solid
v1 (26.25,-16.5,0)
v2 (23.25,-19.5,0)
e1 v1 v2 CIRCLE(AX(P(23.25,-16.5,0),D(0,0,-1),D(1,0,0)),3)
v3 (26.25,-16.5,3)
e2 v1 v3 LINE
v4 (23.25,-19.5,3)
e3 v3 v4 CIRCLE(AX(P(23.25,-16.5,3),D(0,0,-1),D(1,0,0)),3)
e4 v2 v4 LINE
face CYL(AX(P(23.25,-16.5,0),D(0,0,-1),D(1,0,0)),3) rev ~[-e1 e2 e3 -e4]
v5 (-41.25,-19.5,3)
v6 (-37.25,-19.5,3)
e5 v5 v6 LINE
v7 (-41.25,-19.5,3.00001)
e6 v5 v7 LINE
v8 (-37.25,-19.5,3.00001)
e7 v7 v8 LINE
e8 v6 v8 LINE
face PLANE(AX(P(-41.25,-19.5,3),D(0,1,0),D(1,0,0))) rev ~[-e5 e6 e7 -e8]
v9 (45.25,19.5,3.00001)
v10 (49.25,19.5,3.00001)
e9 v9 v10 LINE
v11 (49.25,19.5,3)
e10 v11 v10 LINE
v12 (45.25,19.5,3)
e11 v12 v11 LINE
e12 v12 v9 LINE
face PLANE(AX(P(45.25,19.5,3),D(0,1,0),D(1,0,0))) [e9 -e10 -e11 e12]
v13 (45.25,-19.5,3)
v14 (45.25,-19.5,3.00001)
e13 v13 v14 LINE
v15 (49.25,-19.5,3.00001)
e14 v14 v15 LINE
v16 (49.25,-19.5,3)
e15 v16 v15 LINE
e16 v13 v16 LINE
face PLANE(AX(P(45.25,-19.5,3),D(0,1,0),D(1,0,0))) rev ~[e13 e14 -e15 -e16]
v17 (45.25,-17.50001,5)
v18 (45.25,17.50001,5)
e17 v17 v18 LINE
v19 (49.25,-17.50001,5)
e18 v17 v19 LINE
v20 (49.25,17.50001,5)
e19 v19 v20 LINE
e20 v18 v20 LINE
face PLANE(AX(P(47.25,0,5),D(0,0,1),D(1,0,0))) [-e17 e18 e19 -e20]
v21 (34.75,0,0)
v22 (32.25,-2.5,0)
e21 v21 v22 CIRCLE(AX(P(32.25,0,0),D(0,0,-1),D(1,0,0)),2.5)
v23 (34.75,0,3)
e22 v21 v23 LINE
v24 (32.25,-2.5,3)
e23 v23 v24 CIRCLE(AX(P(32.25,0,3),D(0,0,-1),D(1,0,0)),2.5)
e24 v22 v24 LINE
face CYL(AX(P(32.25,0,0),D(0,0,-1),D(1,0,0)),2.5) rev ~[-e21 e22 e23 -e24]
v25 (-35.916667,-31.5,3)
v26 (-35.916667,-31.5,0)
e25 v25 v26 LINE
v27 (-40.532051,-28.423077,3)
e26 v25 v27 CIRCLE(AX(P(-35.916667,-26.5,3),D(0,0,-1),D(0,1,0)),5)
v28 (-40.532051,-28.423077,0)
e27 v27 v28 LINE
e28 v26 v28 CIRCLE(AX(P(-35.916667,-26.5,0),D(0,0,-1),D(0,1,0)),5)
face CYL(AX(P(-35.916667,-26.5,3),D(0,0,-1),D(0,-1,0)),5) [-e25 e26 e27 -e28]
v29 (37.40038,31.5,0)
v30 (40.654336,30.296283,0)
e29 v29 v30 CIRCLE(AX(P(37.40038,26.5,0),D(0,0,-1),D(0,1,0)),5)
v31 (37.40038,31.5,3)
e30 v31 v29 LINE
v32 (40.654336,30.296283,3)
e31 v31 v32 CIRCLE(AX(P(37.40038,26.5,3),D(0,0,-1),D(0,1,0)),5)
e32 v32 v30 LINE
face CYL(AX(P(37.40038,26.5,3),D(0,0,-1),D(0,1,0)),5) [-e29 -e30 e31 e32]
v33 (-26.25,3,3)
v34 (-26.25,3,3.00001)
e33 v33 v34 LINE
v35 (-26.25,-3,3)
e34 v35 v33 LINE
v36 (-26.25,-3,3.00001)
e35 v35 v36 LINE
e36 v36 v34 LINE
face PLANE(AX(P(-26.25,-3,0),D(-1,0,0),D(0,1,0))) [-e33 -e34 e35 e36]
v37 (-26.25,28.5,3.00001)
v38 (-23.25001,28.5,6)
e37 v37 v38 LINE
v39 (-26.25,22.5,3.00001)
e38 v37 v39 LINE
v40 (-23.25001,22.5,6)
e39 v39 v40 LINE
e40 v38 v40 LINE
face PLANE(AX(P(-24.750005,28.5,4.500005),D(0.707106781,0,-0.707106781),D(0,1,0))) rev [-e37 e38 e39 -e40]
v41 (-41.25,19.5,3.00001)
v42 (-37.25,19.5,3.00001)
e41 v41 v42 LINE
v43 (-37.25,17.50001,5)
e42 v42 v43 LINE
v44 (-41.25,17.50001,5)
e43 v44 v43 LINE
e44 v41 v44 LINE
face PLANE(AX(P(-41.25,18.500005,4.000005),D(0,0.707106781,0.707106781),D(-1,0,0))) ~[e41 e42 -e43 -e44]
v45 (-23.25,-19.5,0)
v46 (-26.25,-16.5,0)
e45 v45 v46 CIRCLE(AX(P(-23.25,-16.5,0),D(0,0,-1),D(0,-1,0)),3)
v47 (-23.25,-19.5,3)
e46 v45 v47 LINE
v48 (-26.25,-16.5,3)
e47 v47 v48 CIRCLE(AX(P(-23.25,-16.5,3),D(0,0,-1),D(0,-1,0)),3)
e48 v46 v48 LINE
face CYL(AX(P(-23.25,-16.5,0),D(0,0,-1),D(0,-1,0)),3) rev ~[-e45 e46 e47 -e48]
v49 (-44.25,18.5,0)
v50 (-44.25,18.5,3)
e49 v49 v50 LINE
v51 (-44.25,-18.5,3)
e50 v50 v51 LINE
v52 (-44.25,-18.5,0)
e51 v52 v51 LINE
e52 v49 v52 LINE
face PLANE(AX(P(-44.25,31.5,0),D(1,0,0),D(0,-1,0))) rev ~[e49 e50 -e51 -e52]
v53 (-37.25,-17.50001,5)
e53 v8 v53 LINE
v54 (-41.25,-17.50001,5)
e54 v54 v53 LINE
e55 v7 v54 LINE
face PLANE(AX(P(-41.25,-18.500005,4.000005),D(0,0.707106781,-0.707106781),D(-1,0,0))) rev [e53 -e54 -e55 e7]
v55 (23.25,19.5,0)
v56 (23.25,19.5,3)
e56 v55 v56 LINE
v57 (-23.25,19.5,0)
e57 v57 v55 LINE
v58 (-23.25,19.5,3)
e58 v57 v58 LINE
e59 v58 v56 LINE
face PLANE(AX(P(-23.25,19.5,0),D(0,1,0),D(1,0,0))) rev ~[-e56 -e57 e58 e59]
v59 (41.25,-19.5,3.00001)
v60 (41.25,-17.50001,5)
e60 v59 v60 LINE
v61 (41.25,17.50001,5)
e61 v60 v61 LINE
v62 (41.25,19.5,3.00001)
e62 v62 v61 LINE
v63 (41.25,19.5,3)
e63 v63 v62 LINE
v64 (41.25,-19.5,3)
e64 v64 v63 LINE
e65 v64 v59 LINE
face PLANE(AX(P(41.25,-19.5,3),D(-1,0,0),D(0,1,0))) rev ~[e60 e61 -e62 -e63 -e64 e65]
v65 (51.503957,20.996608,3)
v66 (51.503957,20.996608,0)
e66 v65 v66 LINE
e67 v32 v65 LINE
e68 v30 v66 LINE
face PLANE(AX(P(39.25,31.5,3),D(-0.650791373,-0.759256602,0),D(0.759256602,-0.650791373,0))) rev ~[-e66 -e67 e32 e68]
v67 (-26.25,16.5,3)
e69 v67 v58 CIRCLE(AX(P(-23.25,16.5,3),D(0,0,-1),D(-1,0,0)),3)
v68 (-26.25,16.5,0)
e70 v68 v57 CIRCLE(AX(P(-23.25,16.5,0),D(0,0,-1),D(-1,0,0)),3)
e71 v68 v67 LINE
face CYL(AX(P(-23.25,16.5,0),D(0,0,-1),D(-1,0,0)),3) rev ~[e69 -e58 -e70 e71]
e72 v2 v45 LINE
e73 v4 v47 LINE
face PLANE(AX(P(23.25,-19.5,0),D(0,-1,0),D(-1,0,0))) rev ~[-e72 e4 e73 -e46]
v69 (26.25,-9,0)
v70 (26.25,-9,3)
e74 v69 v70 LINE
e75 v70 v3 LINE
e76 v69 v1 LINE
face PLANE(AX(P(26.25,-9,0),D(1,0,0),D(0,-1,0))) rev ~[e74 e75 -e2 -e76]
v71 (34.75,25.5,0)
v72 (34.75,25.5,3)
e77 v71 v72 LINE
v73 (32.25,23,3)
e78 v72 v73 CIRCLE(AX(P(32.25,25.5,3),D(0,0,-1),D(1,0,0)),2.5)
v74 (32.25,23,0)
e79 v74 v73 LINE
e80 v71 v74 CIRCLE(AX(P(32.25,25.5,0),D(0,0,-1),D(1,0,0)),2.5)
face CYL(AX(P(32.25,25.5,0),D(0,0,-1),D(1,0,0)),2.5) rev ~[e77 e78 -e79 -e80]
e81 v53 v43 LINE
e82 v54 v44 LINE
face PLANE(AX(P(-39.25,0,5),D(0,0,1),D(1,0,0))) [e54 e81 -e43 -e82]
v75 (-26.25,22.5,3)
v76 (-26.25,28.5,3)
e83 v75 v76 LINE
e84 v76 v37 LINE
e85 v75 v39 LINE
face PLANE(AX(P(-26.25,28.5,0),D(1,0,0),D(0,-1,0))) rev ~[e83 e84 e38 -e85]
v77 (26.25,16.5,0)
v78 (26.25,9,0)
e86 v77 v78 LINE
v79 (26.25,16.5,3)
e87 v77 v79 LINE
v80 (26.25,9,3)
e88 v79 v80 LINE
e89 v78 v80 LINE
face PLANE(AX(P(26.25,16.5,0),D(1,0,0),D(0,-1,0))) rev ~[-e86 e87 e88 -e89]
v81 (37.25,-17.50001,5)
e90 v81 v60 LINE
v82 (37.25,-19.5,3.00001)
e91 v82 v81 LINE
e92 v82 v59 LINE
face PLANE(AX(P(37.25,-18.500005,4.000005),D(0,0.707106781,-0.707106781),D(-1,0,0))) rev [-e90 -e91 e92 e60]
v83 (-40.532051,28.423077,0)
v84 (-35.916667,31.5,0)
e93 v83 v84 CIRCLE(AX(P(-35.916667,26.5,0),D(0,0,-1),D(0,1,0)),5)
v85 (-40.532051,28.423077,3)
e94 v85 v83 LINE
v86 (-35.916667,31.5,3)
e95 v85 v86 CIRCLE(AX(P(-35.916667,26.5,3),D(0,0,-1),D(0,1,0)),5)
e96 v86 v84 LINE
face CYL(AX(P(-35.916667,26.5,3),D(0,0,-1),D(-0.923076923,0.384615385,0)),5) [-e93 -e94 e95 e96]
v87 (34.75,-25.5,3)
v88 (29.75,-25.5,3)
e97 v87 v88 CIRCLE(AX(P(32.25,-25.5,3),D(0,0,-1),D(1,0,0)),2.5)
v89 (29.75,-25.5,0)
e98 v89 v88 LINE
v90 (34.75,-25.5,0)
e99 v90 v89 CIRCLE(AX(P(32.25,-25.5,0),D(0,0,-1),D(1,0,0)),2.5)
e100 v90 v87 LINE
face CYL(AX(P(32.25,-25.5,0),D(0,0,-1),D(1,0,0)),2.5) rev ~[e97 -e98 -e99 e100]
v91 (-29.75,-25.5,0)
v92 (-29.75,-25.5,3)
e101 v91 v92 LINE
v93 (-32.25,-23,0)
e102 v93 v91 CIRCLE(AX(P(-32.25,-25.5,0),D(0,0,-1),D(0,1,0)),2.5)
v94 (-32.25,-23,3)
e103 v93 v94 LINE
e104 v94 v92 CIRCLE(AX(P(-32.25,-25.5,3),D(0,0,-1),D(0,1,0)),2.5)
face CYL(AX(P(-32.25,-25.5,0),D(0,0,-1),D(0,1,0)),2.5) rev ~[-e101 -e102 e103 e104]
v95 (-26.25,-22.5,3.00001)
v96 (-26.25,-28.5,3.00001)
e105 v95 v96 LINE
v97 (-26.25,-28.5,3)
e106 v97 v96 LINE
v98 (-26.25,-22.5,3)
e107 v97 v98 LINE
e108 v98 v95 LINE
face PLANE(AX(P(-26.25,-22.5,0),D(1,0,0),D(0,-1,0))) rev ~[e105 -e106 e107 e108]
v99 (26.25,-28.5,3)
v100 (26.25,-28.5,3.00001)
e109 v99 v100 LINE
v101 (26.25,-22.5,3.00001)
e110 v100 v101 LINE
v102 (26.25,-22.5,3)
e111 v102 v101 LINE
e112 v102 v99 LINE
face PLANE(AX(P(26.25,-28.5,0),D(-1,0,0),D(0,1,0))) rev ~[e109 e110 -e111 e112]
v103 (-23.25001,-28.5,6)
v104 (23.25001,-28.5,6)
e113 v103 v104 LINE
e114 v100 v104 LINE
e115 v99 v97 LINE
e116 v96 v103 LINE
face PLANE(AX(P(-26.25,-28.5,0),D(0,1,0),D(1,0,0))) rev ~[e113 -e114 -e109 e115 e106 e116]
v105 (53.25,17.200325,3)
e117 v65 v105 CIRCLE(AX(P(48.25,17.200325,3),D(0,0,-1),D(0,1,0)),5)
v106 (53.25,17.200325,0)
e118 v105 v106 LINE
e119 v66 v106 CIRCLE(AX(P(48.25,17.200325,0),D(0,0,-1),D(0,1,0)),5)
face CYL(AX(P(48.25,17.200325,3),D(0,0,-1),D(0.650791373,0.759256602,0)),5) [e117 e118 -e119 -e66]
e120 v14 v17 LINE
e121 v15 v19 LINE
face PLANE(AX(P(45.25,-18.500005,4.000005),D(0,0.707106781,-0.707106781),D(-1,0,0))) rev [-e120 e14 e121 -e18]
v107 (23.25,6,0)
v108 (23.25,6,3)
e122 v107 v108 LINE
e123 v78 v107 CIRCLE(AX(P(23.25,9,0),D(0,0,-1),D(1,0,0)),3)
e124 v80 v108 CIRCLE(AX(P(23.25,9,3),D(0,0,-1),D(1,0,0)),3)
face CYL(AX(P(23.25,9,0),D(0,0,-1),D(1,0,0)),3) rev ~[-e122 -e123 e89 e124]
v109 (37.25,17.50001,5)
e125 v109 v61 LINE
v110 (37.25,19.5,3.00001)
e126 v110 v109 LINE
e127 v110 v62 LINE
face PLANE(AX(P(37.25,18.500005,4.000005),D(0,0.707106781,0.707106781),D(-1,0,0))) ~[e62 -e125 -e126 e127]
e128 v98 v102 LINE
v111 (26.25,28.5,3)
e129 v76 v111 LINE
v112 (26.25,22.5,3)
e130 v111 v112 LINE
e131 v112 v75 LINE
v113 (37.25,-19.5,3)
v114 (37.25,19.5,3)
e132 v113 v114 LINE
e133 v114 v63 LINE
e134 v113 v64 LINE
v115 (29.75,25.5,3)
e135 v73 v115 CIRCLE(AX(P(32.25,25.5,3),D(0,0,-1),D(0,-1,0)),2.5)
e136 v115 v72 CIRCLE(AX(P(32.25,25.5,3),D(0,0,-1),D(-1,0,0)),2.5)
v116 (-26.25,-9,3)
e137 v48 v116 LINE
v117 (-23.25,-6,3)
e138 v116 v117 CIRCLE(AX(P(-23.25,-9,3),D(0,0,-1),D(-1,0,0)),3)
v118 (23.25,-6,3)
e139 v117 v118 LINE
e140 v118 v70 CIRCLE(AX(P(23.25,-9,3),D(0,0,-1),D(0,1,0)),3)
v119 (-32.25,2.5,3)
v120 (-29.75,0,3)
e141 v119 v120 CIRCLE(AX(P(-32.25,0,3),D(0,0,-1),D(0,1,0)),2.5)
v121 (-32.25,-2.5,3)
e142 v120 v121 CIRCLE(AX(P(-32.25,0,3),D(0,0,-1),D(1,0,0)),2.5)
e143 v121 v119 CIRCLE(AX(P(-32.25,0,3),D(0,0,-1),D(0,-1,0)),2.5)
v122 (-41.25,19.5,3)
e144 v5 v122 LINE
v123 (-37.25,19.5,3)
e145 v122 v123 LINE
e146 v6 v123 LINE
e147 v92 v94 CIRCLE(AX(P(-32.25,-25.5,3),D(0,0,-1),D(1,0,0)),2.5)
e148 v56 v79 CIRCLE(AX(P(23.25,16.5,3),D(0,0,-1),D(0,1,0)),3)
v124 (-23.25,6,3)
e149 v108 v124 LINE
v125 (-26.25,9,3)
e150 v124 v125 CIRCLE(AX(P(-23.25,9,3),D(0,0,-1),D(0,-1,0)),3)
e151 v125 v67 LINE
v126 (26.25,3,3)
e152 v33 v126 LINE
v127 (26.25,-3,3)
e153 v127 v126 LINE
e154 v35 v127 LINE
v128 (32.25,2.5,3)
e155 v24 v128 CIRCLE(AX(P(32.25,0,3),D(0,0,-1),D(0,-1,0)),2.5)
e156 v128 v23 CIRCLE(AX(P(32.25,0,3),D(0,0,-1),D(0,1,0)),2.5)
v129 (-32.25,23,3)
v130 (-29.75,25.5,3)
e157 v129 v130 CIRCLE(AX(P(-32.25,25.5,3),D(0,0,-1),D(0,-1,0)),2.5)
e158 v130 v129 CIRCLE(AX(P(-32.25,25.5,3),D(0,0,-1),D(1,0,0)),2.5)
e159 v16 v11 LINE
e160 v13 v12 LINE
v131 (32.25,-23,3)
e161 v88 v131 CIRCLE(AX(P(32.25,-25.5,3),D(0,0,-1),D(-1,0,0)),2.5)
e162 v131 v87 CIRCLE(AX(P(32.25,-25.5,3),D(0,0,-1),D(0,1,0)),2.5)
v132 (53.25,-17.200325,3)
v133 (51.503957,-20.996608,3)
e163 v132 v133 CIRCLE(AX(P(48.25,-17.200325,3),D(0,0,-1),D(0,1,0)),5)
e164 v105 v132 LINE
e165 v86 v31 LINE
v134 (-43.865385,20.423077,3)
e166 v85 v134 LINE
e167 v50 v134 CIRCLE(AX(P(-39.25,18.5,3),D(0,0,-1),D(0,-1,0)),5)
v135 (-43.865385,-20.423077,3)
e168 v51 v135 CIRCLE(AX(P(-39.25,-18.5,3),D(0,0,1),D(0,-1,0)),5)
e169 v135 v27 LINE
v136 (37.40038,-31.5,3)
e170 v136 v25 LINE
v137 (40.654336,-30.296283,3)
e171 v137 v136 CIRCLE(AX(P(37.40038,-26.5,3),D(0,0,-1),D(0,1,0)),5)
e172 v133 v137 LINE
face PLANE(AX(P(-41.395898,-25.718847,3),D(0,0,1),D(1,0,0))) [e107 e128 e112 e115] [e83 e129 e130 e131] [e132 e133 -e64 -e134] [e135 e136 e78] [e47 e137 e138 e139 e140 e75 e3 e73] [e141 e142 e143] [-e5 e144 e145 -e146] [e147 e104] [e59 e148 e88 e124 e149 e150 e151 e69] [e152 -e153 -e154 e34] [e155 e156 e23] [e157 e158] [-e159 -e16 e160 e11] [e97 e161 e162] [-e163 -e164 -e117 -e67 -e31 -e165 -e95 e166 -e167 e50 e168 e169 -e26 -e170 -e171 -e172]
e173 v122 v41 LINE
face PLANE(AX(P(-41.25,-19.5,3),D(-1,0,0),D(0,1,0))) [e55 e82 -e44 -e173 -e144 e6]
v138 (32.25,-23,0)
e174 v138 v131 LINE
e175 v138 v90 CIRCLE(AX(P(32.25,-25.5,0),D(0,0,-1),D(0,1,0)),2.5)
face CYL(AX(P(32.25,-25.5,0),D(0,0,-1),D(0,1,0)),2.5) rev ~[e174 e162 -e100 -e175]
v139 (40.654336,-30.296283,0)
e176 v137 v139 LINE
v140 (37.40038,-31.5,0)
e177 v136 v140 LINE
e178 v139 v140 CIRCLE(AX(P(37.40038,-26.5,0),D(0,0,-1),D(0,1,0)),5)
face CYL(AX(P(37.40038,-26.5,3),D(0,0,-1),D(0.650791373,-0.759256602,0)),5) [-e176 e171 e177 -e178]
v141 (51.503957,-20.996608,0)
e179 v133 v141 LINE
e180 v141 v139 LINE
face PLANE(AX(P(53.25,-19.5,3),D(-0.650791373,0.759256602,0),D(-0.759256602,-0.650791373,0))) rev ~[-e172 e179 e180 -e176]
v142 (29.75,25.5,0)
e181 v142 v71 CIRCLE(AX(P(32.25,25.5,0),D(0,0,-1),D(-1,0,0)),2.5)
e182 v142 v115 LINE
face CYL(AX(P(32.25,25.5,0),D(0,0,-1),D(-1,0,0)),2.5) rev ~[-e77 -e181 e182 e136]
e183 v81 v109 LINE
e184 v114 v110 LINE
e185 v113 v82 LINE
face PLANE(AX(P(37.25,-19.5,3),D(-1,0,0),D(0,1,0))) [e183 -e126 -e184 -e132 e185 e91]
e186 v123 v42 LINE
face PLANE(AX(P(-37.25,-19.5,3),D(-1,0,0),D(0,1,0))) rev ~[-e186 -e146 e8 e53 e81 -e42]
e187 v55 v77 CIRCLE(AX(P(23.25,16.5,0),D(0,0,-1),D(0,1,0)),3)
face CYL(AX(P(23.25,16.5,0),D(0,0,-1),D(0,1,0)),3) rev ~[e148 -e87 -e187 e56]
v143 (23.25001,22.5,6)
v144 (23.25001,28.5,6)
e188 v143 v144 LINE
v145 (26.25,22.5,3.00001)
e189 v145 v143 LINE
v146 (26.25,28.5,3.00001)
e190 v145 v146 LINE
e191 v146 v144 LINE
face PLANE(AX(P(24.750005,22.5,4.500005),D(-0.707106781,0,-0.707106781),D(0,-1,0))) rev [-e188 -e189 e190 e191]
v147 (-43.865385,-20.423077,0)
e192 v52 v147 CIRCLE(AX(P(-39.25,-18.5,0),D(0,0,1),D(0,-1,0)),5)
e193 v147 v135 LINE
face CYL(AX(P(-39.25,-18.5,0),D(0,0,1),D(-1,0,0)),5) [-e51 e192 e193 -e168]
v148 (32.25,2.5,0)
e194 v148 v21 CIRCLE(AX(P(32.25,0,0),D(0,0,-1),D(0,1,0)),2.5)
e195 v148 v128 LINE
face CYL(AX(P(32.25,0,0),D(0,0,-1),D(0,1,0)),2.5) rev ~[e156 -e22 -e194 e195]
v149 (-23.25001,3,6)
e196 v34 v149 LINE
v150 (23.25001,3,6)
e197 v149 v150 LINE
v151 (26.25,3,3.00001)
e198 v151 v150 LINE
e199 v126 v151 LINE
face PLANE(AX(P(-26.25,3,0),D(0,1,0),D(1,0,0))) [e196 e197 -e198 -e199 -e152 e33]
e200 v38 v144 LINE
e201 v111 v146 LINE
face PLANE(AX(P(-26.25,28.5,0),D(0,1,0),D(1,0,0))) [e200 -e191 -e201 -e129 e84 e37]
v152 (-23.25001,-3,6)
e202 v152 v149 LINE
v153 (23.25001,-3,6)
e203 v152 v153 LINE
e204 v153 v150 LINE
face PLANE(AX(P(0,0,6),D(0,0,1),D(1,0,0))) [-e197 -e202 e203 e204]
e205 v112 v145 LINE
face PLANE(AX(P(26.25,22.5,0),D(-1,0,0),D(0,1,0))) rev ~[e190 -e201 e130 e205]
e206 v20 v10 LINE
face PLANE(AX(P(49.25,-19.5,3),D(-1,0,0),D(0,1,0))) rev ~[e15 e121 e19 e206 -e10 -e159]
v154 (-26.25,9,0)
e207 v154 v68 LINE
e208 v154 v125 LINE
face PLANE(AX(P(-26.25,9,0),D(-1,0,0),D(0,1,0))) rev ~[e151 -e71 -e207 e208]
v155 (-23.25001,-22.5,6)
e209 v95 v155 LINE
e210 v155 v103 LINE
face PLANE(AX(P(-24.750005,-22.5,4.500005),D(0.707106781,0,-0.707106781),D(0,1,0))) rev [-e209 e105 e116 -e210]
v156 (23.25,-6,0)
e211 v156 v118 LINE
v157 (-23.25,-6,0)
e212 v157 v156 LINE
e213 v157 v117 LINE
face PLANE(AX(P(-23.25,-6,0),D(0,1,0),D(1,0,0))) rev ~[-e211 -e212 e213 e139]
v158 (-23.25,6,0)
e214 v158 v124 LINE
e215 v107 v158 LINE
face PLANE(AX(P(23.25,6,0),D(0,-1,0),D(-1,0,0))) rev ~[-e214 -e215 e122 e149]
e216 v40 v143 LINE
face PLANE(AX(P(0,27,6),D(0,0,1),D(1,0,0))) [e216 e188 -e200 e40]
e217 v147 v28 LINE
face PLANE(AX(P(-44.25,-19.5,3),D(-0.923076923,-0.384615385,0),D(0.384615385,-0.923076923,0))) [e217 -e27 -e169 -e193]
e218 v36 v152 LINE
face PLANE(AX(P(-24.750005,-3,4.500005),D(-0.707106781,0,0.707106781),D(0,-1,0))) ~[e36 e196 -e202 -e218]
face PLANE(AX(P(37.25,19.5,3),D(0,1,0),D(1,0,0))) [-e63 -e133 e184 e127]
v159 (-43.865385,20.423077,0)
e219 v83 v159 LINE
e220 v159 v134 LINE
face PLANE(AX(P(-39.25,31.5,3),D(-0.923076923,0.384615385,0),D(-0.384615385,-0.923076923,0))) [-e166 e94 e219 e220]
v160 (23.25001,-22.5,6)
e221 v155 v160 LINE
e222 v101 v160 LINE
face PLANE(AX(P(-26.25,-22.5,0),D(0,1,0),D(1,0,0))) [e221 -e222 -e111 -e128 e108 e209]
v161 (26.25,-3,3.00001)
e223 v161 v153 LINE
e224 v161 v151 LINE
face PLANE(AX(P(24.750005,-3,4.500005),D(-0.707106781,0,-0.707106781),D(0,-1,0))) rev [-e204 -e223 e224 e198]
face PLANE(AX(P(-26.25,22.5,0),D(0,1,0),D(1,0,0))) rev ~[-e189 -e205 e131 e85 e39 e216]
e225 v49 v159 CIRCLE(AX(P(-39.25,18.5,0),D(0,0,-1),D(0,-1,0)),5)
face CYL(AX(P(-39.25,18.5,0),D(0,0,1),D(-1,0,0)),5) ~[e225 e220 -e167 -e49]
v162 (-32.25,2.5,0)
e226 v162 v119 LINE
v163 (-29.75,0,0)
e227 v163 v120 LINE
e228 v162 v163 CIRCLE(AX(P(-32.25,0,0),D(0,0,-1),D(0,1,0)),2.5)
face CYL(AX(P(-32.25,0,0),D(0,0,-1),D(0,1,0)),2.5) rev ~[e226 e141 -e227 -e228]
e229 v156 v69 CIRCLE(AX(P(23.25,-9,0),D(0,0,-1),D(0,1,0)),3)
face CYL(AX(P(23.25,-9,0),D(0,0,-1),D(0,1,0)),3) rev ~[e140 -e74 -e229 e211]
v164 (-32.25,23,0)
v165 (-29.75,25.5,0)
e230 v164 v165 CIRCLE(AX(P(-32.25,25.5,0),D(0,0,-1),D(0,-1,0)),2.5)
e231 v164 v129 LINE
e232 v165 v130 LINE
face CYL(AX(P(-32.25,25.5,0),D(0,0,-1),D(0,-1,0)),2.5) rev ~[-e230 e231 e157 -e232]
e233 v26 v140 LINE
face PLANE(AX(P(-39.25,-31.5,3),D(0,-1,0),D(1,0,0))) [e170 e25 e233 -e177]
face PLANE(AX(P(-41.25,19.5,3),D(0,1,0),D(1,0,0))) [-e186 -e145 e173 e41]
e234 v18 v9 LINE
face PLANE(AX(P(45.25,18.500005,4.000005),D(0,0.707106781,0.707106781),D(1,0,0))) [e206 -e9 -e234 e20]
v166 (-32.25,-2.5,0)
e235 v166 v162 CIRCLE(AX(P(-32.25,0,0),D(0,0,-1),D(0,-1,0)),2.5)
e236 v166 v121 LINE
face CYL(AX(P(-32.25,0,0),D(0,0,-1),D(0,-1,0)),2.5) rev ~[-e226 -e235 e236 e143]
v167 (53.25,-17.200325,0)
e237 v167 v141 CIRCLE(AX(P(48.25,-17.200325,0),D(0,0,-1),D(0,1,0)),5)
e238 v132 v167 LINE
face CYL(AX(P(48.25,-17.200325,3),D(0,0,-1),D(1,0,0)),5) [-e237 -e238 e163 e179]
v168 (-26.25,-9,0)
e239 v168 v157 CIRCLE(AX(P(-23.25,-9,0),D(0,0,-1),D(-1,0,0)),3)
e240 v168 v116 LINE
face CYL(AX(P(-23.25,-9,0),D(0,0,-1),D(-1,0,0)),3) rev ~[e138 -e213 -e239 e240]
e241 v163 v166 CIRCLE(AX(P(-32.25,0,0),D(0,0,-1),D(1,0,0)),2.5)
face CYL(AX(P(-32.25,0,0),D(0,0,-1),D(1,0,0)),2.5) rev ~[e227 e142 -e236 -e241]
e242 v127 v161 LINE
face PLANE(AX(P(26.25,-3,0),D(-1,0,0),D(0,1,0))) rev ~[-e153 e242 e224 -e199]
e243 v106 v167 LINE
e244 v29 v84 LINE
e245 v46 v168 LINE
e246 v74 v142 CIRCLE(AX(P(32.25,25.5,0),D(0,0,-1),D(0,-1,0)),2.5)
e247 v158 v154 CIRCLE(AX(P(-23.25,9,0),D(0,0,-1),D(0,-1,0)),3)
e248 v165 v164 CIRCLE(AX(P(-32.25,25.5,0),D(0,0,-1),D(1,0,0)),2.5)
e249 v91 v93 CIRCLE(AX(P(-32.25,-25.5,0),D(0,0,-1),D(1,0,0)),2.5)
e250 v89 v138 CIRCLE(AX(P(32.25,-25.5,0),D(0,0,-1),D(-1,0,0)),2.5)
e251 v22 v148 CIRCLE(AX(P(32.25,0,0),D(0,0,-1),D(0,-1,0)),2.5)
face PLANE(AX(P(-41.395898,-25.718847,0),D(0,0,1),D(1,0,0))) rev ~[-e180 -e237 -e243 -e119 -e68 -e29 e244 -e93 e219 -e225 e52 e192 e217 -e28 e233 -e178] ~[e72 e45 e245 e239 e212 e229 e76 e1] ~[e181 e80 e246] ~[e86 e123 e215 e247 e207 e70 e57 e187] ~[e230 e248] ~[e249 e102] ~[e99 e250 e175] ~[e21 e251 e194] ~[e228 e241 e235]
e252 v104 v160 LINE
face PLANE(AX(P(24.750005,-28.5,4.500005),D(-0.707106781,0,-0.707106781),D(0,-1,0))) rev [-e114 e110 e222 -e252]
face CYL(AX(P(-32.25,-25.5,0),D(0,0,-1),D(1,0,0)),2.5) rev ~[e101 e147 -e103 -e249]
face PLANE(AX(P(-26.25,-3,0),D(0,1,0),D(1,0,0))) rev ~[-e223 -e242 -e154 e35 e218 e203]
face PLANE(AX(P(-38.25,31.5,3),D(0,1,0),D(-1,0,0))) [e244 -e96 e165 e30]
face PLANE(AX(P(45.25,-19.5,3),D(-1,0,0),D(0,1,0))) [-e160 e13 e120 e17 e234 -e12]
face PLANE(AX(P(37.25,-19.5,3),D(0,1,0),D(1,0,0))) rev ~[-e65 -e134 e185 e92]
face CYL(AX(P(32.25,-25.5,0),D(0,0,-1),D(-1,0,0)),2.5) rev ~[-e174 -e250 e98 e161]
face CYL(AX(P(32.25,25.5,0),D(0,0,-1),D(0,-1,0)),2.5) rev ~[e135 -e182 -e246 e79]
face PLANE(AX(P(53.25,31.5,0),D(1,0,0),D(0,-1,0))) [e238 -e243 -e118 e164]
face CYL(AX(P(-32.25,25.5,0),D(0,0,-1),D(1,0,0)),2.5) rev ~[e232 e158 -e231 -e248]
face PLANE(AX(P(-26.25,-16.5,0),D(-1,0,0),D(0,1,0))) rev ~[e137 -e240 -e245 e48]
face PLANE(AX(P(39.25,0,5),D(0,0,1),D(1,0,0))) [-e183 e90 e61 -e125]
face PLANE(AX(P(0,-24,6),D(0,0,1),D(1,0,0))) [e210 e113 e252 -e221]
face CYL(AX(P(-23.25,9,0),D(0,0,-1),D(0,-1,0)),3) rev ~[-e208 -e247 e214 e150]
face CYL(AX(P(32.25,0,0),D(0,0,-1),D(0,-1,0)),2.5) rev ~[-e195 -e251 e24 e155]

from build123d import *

# Parameters (mm, degrees)
F0_W       = 52.5
F0_H       = 3
F1_DEPTH   = 6
F0_H_2     = 6
F2_DEPTH   = 3
F4_SIZE    = 2.99999
F5_SIZE2   = 6
F5_SIZE    = 12
F5_2_SIZE2 = 6
F5_2_SIZE  = 12
F6_W       = 4
F6_H       = 39
F7_DEPTH   = 2
F8_SIZE    = 1.99999
F10_DEPTH  = 3
F13_DEPTH  = 3
F12_W      = 4
F12_H      = 39
F15_DEPTH  = 2
F16_SIZE   = 1.99999
F17_SIZE   = 1.99999
F18_DEPTH  = 25
F19_R      = 5


# Not quite as in the source:
# - a fillet or chamfer is up to 0.001 mm smaller than in the source, because OpenCascade refuses the exact size


with BuildPart() as f1:
    # F0 (on Top) → F1 (new body)
    with BuildSketch(Plane.XY):
        with Locations((0, 27)):
            Rectangle(F0_W, F0_H)
        with Locations((0, 24)):
            Rectangle(F0_W, F0_H)
    extrude(amount=F1_DEPTH)


with BuildPart() as f1b:
    # F0 (on Top) → F1, piece 2 (new body)
    with BuildSketch(Plane.XY):
        Rectangle(F0_W, F0_H_2)
    extrude(amount=F1_DEPTH)


with BuildPart() as f1c:
    # F0 (on Top) → F1, piece 3 (new body)
    with BuildSketch(Plane.XY):
        with Locations((0, -24)):
            Rectangle(F0_W, F0_H)
        with Locations((0, -27)):
            Rectangle(F0_W, F0_H)
    extrude(amount=F1_DEPTH)


with BuildPart() as f2:
    # F0 (on Top) → F2 (new body)
    with BuildSketch(Plane.XY):
        Polygon((-38.25, 28.5), (-38.25, -28.5), (-38.25, -31.5), (-35.25, -31.5), (35.25, -31.5), (38.25, -31.5), (38.25, -28.5), (38.25, 28.5), (38.25, 31.5), (35.25, 31.5), (-35.25, 31.5), (-38.25, 31.5), align=None)
        with BuildLine():
            Line((-26.25, -25.5), (-29.75, -25.5))
            ThreePointArc((-29.75, -25.5), (-34.017766953, -27.267766953), (-32.25, -23))
            Line((-32.25, -23), (-32.25, -2.5))
            ThreePointArc((-32.25, -2.5), (-34.75, 0), (-32.25, 2.5))
            Line((-32.25, 2.5), (-32.25, 23))
            ThreePointArc((-32.25, 23), (-34.017766953, 27.267766953), (-29.75, 25.5))
            Line((-29.75, 25.5), (-26.25, 25.5))
            Line((-26.25, 25.5), (-26.25, 28.5))
            Line((-26.25, 28.5), (26.25, 28.5))
            Line((26.25, 28.5), (26.25, 25.5))
            Line((26.25, 25.5), (29.75, 25.5))
            ThreePointArc((29.75, 25.5), (32.25, 28), (34.75, 25.5))
            ThreePointArc((34.75, 25.5), (34.017766953, 23.732233047), (32.25, 23))
            Line((32.25, 23), (32.25, 2.5))
            ThreePointArc((32.25, 2.5), (34.017766953, 1.767766953), (34.75, 0))
            ThreePointArc((34.75, 0), (34.017766953, -1.767766953), (32.25, -2.5))
            Line((32.25, -2.5), (32.25, -23))
            ThreePointArc((32.25, -23), (34.017766953, -23.732233047), (34.75, -25.5))
            ThreePointArc((34.75, -25.5), (32.25, -28), (29.75, -25.5))
            Line((29.75, -25.5), (26.25, -25.5))
            Line((26.25, -25.5), (26.25, -28.5))
            Line((26.25, -28.5), (-26.25, -28.5))
            Line((-26.25, -28.5), (-26.25, -25.5))
        make_face(mode=Mode.SUBTRACT)
        with BuildLine():
            ThreePointArc((-32.25, -23), (-30.482233047, -23.732233047), (-29.75, -25.5))
            Line((-29.75, -25.5), (-26.25, -25.5))
            Line((-26.25, -25.5), (-26.25, -22.5))
            Line((-26.25, -22.5), (26.25, -22.5))
            Line((26.25, -22.5), (26.25, -25.5))
            Line((26.25, -25.5), (29.75, -25.5))
            ThreePointArc((29.75, -25.5), (30.482233047, -23.732233047), (32.25, -23))
            Line((32.25, -23), (32.25, -2.5))
            ThreePointArc((32.25, -2.5), (29.75, 0), (32.25, 2.5))
            Line((32.25, 2.5), (32.25, 23))
            ThreePointArc((32.25, 23), (30.482233047, 23.732233047), (29.75, 25.5))
            Line((29.75, 25.5), (26.25, 25.5))
            Line((26.25, 25.5), (26.25, 22.5))
            Line((26.25, 22.5), (-26.25, 22.5))
            Line((-26.25, 22.5), (-26.25, 25.5))
            Line((-26.25, 25.5), (-29.75, 25.5))
            ThreePointArc((-29.75, 25.5), (-30.482233047, 23.732233047), (-32.25, 23))
            Line((-32.25, 23), (-32.25, 2.5))
            ThreePointArc((-32.25, 2.5), (-30.482233047, 1.767766953), (-29.75, 0))
            ThreePointArc((-29.75, 0), (-30.482233047, -1.767766953), (-32.25, -2.5))
            Line((-32.25, -2.5), (-32.25, -23))
        make_face()
        with BuildLine():
            ThreePointArc((-23.25, -19.5), (-25.3713203436, -18.6213203436), (-26.25, -16.5))
            Line((-26.25, -16.5), (-26.25, -9))
            ThreePointArc((-26.25, -9), (-25.3713203436, -6.8786796564), (-23.25, -6))
            Line((-23.25, -6), (23.25, -6))
            ThreePointArc((23.25, -6), (25.3713203436, -6.8786796564), (26.25, -9))
            Line((26.25, -9), (26.25, -16.5))
            ThreePointArc((26.25, -16.5), (25.3713203436, -18.6213203436), (23.25, -19.5))
            Line((23.25, -19.5), (-23.25, -19.5))
        make_face(mode=Mode.SUBTRACT)
        Rectangle(F0_W, F0_H_2, mode=Mode.SUBTRACT)
        with BuildLine():
            Line((-23.25, 19.5), (23.25, 19.5))
            ThreePointArc((23.25, 19.5), (25.3713203436, 18.6213203436), (26.25, 16.5))
            Line((26.25, 16.5), (26.25, 9))
            ThreePointArc((26.25, 9), (25.3713203436, 6.8786796564), (23.25, 6))
            Line((23.25, 6), (-23.25, 6))
            ThreePointArc((-23.25, 6), (-25.3713203436, 6.8786796564), (-26.25, 9))
            Line((-26.25, 9), (-26.25, 16.5))
            ThreePointArc((-26.25, 16.5), (-25.3713203436, 18.6213203436), (-23.25, 19.5))
        make_face(mode=Mode.SUBTRACT)
        Polygon((-38.25, -31.5), (-38.25, -28.5), (-38.25, 28.5), (-38.25, 31.5), (-41.25, 31.5), (-44.25, 31.5), (-44.25, 28.5), (-44.25, -28.5), (-44.25, -31.5), (-41.25, -31.5), align=None)
        Polygon((38.25, -28.5), (38.25, -31.5), (41.25, -31.5), (44.25, -31.5), (44.25, -28.5), (44.25, 28.5), (44.25, 31.5), (41.25, 31.5), (38.25, 31.5), (38.25, 28.5), align=None)
    extrude(amount=F2_DEPTH)


with BuildPart() as f1c_1:
    add(f1c.part)

    # F3: union F1, F1b, F2
    add(f1.part)
    add(f1b.part)
    add(f2.part)

    # F4 (size 3 in the source; OpenCascade refuses exactly that, so slightly less here)
    f4_edges = [f1c_1.edges().sort_by_distance(p)[0] for p in [
        (26.25, 25.5, 6),
        (26.25, 0, 6),
        (26.25, -25.5, 6),
        (-26.25, 25.5, 6),
        (-26.25, 0, 6),
        (-26.25, -25.5, 6),
    ]]
    chamfer(f4_edges, length=F4_SIZE)

    # F5
    f5_edges = [f1c_1.edges().sort_by_distance(p)[0] for p in [
        (44.25, -31.5, 1.5),
        (44.25, 31.5, 1.5),
    ]]
    f5_side = f1c_1.faces().sort_by_distance((44.25, 0, 1.5))[0]
    chamfer(f5_edges, length=F5_SIZE, length2=F5_SIZE2, reference=f5_side)

    # F5#2
    f5_2_edges = [f1c_1.edges().sort_by_distance(p)[0] for p in [
        (-44.25, -31.5, 1.5),
        (-44.25, 31.5, 1.5),
    ]]
    f5_2_side = f1c_1.faces().sort_by_distance((-44.25, 0, 1.5))[0]
    chamfer(f5_2_edges, length=F5_2_SIZE, length2=F5_2_SIZE2, reference=f5_2_side)

    # F6 (on face) → F7 (join)
    with BuildSketch(Plane.XY.offset(3)):
        with Locations((-39.25, 0)):
            Rectangle(F6_W, F6_H)
        with Locations((39.25, 0)):
            Rectangle(F6_W, F6_H)
    extrude(amount=F7_DEPTH)

    # F8 (size 2 in the source; OpenCascade refuses exactly that, so slightly less here)
    f8_edges = [f1c_1.edges().sort_by_distance(p)[0] for p in [
        (-39.25, -19.5, 5),
        (-39.25, 19.5, 5),
        (39.25, 19.5, 5),
        (39.25, -19.5, 5),
    ]]
    chamfer(f8_edges, length=F8_SIZE)


with BuildPart() as f10:
    # F9 (on face) → F10 (new body)
    with BuildSketch(Plane(origin=(0, 0, 0), x_dir=(1, 0, 0), z_dir=(0, 0, -1))):
        Polygon((53.25, 31.5), (38.25, 31.5), (44.25, 19.5), (44.25, -19.5), (38.25, -31.5), (53.25, -31.5), align=None)
    extrude(amount=-F10_DEPTH)


with BuildPart() as f1c_2:
    add(f1c_1.part)

    # F11: union F10
    add(f10.part)


with BuildPart() as f13:
    # F12 (on face) → F13 (new body)
    with BuildSketch(Plane.XY.offset(3)):
        Polygon((-38.25, -31.5), (-44.25, -19.5), (-39.25, -31.5), align=None)
    extrude(amount=-F13_DEPTH)


with BuildPart() as f13b:
    # F12 (on face) → F13, piece 2 (new body)
    with BuildSketch(Plane.XY.offset(3)):
        Polygon((-38.25, 31.5), (-39.25, 31.5), (-44.25, 19.5), align=None)
    extrude(amount=-F13_DEPTH)


with BuildPart() as f1c_3:
    add(f1c_2.part)

    # F14: union F13b, F13
    add(f13b.part)
    add(f13.part)

    # F12 (on face) → F15 (join)
    with BuildSketch(Plane.XY.offset(3)):
        with Locations((47.25, 0)):
            Rectangle(F12_W, F12_H)
    extrude(amount=F15_DEPTH)

    # F16 (size 2 in the source; OpenCascade refuses exactly that, so slightly less here)
    f16_edges = [f1c_3.edges().sort_by_distance(p)[0] for p in [
        (47.25, -19.5, 5),
    ]]
    chamfer(f16_edges, length=F16_SIZE)

    # F17 (size 2 in the source; OpenCascade refuses exactly that, so slightly less here)
    f17_edges = [f1c_3.edges().sort_by_distance(p)[0] for p in [
        (47.25, 19.5, 5),
    ]]
    chamfer(f17_edges, length=F17_SIZE)

    # F12 (on face) → F18 (cut)
    with BuildSketch(Plane.XY.offset(3)):
        Polygon((53.25, 31.5), (39.25, 31.5), (53.25, 19.5), align=None)
        Polygon((53.25, -19.5), (39.25, -31.5), (53.25, -31.5), align=None)
    extrude(amount=-F18_DEPTH, mode=Mode.SUBTRACT)

    # F19
    f19_edges = [f1c_3.edges().sort_by_distance(p)[0] for p in [
        (39.25, -31.5, 1.5),
        (53.25, -19.5, 1.5),
        (-39.25, -31.5, 1.5),
        (-44.25, -19.5, 1.5),
        (-44.25, 19.5, 1.5),
        (-39.25, 31.5, 1.5),
        (39.25, 31.5, 1.5),
        (53.25, 19.5, 1.5),
    ]]
    fillet(f19_edges, radius=F19_R)


solid = f1c_3.part
